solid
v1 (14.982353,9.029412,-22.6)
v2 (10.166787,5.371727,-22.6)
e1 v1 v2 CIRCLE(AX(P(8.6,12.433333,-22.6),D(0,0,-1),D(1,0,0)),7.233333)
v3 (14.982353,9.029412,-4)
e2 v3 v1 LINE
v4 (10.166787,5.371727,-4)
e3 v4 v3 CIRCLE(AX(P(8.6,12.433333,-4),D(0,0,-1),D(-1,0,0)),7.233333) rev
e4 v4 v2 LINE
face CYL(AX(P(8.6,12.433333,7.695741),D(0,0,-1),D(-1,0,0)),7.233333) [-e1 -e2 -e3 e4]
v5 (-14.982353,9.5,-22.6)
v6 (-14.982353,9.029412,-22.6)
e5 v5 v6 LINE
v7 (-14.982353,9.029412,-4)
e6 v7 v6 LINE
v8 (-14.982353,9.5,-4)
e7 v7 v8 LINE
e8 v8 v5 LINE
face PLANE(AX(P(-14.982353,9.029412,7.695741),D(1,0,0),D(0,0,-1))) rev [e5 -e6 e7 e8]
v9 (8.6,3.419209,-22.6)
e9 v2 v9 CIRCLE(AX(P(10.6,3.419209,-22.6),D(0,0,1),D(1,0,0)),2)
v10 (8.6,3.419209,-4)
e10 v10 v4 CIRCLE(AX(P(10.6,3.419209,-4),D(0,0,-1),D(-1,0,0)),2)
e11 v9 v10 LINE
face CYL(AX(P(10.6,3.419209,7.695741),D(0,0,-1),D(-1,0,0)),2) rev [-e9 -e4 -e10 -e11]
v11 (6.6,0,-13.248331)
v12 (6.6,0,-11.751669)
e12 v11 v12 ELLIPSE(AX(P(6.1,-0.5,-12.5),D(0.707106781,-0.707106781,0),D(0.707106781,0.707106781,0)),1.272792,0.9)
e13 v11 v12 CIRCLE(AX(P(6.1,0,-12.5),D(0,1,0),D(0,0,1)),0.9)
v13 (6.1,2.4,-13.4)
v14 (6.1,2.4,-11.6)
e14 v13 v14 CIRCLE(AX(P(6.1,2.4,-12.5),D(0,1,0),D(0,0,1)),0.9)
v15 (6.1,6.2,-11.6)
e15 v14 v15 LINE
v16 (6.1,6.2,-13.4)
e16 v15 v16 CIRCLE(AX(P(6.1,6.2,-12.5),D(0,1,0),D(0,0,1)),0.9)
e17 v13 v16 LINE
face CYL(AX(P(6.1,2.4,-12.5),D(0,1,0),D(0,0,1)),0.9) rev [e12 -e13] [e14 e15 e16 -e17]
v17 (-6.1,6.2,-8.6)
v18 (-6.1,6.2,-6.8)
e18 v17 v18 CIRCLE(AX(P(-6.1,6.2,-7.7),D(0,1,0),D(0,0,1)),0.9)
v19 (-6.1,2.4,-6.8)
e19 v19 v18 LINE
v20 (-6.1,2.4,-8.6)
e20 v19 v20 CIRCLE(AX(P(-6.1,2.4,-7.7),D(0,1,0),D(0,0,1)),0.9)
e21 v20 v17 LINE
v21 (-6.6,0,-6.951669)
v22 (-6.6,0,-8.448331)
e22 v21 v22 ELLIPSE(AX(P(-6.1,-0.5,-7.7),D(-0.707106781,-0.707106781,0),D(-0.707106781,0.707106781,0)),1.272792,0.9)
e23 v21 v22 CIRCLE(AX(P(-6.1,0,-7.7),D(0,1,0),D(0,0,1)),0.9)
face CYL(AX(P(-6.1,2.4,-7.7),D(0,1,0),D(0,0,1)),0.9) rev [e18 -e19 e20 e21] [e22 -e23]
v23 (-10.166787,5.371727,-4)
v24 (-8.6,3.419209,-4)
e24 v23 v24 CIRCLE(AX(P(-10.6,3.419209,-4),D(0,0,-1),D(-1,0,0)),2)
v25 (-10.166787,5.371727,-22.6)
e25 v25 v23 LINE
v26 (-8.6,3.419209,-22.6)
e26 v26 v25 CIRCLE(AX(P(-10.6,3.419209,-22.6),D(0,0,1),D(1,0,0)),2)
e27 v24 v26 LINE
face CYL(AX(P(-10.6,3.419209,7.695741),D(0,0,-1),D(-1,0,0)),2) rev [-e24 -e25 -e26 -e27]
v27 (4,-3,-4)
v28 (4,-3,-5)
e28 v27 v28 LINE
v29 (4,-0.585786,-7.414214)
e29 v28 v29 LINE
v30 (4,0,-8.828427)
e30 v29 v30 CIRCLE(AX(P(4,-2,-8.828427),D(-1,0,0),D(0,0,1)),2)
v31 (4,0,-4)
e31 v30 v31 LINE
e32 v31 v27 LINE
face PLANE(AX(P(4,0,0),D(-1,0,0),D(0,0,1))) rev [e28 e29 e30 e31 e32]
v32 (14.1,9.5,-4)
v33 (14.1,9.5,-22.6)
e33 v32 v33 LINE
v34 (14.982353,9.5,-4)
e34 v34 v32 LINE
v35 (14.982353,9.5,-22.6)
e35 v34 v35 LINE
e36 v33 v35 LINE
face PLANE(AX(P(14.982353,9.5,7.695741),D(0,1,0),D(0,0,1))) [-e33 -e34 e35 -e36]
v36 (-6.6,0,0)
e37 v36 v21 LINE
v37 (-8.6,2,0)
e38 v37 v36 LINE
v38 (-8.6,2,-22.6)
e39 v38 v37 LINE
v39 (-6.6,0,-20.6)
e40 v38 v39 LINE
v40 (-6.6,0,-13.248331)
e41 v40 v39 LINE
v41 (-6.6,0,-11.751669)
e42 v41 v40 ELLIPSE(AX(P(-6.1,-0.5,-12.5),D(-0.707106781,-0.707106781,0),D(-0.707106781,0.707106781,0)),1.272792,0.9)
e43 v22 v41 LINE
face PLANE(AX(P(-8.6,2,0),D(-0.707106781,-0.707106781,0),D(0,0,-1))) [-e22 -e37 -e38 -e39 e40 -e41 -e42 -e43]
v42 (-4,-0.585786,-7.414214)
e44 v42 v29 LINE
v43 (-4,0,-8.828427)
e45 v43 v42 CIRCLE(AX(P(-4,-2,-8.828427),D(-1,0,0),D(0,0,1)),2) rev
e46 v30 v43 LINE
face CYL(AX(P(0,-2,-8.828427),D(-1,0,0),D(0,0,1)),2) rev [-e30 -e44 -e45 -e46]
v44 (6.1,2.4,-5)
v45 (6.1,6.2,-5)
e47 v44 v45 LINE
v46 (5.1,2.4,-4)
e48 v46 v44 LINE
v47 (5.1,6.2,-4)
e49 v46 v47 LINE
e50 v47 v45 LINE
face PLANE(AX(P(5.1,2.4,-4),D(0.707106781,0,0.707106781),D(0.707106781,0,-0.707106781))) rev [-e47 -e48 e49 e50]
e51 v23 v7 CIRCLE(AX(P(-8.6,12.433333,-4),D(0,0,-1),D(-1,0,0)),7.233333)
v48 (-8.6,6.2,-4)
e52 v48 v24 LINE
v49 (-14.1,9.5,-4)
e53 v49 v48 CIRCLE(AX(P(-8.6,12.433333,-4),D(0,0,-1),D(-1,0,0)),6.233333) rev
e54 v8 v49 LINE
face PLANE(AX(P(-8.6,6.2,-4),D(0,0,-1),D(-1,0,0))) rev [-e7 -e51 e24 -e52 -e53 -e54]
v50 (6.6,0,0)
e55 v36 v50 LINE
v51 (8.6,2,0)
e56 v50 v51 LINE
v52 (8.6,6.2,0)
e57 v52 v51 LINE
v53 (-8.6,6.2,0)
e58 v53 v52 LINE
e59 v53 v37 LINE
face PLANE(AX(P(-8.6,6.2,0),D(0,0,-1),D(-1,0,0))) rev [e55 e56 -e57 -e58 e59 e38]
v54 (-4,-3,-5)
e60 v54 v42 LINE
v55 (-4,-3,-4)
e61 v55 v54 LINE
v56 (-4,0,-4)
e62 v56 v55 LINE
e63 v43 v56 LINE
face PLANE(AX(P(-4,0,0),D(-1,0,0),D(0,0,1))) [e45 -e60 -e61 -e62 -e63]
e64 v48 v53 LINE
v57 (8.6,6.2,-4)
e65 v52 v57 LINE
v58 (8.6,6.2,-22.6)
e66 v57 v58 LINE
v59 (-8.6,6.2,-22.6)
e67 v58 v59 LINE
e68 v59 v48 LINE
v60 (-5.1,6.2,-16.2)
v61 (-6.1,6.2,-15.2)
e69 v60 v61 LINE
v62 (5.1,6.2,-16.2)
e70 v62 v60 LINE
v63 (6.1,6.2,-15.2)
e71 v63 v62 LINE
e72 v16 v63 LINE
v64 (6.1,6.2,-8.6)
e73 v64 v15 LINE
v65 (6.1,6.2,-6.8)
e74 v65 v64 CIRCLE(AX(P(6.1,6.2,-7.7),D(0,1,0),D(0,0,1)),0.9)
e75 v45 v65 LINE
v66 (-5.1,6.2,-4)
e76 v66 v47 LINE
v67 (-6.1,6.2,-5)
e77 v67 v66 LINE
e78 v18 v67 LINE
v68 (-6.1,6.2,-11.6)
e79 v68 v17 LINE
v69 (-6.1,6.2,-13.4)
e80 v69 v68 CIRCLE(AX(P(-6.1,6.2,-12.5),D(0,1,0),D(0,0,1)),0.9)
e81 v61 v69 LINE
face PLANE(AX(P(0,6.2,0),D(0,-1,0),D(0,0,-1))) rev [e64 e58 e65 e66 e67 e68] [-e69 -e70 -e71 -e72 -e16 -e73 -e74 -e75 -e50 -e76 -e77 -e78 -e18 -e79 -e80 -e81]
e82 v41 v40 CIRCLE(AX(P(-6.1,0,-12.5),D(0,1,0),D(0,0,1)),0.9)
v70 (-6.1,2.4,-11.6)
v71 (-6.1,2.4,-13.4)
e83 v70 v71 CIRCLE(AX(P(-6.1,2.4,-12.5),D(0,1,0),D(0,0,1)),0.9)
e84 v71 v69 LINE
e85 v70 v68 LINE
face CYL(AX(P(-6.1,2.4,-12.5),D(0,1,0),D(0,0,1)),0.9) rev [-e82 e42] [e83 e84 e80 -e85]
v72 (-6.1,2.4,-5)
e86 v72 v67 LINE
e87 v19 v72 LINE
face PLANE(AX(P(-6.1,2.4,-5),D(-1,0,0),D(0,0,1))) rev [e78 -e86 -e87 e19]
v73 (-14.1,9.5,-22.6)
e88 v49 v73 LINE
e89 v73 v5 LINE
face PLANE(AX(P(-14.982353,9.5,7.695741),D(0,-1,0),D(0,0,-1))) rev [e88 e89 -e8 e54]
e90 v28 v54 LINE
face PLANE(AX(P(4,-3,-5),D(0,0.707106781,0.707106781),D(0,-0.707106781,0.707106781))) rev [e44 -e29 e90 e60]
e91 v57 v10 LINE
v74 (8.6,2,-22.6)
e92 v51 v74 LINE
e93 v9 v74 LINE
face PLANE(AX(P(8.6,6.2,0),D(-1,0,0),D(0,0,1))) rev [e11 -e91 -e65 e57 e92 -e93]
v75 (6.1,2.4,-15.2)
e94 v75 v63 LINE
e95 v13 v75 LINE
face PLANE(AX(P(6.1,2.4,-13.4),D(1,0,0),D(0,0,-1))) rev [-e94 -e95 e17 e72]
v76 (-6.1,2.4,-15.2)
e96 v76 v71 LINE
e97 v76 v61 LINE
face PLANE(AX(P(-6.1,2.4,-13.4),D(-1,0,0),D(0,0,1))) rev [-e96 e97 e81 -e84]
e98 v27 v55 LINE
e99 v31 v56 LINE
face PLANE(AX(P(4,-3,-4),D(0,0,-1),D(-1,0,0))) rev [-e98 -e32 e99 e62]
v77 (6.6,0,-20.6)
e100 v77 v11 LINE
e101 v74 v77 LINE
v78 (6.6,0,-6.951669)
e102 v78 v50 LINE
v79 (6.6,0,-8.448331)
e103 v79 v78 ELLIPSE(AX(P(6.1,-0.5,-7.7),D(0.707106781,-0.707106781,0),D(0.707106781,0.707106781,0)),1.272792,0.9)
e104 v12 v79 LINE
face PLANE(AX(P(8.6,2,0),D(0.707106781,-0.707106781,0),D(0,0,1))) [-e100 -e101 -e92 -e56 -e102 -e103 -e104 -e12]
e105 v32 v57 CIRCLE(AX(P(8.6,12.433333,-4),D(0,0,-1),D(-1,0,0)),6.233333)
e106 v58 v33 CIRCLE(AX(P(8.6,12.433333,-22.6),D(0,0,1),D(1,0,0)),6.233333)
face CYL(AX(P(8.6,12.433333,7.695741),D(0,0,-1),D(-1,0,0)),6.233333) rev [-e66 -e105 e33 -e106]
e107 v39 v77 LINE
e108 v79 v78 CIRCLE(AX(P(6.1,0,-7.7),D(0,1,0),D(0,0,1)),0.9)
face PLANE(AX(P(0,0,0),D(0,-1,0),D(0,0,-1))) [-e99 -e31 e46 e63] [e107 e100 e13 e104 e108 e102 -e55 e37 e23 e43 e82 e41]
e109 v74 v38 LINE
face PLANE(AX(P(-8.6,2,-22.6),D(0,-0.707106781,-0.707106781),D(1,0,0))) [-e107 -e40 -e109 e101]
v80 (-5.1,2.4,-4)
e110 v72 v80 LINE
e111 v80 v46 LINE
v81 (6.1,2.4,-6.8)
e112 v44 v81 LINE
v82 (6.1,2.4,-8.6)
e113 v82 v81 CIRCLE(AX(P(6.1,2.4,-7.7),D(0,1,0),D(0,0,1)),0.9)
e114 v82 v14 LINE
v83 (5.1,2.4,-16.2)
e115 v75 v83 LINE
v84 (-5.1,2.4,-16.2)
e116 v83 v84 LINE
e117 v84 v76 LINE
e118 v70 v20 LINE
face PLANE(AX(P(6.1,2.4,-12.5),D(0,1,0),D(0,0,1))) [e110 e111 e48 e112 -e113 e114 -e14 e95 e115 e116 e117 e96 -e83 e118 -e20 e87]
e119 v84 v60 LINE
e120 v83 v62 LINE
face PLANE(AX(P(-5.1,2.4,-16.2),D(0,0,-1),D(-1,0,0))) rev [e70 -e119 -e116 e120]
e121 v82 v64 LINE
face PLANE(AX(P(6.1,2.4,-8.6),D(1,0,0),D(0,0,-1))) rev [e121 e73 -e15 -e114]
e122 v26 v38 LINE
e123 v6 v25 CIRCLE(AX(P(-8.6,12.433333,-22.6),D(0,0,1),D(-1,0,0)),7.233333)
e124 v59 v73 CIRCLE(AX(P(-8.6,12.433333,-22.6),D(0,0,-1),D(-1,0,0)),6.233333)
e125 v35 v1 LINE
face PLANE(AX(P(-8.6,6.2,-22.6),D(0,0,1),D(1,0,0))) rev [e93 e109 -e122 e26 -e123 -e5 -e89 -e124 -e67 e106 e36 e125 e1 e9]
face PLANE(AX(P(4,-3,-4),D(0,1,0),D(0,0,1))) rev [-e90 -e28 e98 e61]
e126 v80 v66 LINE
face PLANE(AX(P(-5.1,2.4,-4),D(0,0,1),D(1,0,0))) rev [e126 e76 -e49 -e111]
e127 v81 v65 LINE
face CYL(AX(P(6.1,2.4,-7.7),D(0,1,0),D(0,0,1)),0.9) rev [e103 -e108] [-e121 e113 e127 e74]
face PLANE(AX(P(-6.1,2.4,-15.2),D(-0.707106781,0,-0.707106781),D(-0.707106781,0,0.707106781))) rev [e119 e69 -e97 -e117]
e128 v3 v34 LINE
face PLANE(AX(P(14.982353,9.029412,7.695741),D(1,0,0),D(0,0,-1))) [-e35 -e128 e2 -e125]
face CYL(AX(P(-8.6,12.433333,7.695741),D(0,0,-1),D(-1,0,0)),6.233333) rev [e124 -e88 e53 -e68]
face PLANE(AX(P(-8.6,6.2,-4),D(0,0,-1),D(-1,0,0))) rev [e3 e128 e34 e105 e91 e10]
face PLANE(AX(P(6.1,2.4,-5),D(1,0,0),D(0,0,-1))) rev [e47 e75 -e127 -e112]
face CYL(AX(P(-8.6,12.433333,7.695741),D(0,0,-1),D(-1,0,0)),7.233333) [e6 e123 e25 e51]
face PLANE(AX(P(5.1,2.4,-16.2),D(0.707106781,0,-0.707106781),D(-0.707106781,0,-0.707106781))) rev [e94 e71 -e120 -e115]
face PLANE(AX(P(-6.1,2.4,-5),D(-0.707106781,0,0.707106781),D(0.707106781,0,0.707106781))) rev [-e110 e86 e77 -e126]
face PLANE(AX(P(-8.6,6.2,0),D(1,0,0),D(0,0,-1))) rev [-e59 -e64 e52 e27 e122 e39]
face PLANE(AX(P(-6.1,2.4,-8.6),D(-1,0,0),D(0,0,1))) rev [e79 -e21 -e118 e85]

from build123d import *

# Parameters (mm, degrees)
ESQUISSE1_W             = 17.2
ESQUISSE1_H             = 22.6
BOSS_EXTRU_1_DEPTH      = 6.2
ENL_V_MAT_EXTRU_1_DEPTH = 3.8
ESQUISSE3_R             = 0.9
ENL_V_MAT_EXTRU_2_DEPTH = 25.477744994
CHANFREIN1_SIZE         = 2
BOSS_EXTRU_2_DEPTH      = 18.6
BOSS_EXTRU_3_DEPTH      = 4
CONG_1_R                = 2


with BuildPart() as part:
    # Esquisse1 → Boss.-Extru.1 (new body)
    with BuildSketch(Plane(origin=(0, 0, 0), x_dir=(1, 0, 0), z_dir=(0, 1, 0))):
        with Locations((0, 11.3)):
            Rectangle(ESQUISSE1_W, ESQUISSE1_H)
    extrude(amount=BOSS_EXTRU_1_DEPTH)

    # Esquisse2 → Enlèv. mat.-Extru.1 (cut)
    with BuildSketch(Plane(origin=(0, 6.2, 0), x_dir=(1, 0, 0), z_dir=(0, 1, 0))):
        with BuildLine():
            Line((-5.1, 4), (5.1, 4))
            Line((5.1, 4), (6.1, 5))
            Line((6.1, 5), (6.1, 6.8))
            ThreePointArc((6.1, 6.8), (7, 7.7), (6.1, 8.6))
            Line((6.1, 8.6), (6.1, 11.6))
            ThreePointArc((6.1, 11.6), (7, 12.5), (6.1, 13.4))
            Line((6.1, 13.4), (6.1, 15.2))
            Line((6.1, 15.2), (5.1, 16.2))
            Line((5.1, 16.2), (-5.1, 16.2))
            Line((-5.1, 16.2), (-6.1, 15.2))
            Line((-6.1, 15.2), (-6.1, 13.4))
            ThreePointArc((-6.1, 13.4), (-7, 12.5), (-6.1, 11.6))
            Line((-6.1, 11.6), (-6.1, 8.6))
            ThreePointArc((-6.1, 8.6), (-7, 7.7), (-6.1, 6.8))
            Line((-6.1, 6.8), (-6.1, 5))
            Line((-6.1, 5), (-5.1, 4))
        make_face()
    extrude(amount=-ENL_V_MAT_EXTRU_1_DEPTH, mode=Mode.SUBTRACT)

    # Esquisse3 → Enlèv. mat.-Extru.2 (cut, through all)
    with BuildSketch(Plane(origin=(0, 2.4, 0), x_dir=(1, 0, 0), z_dir=(0, 1, 0))):
        with Locations(Location((6.1, 12.5, 0), (0, 0, 270))):
            Circle(ESQUISSE3_R)
        with Locations(Location((-6.1, 12.5, 0), (0, 0, 270))):
            Circle(ESQUISSE3_R)
        with Locations(Location((-6.1, 7.7, 0), (0, 0, 270))):
            Circle(ESQUISSE3_R)
        with Locations(Location((6.1, 7.7, 0), (0, 0, 270))):
            Circle(ESQUISSE3_R)
    extrude(amount=-ENL_V_MAT_EXTRU_2_DEPTH, mode=Mode.SUBTRACT)

    # Chanfrein1
    # the kernel refuses this chamfer: 2 mm, written as the material it takes off along each edge
    with BuildSketch(Plane(origin=(13.743365976, 0, -22.6), x_dir=(0, -0.02749587661058639, 0.9996219169112968), z_dir=(-1, 0, 0))) as chanfrein1_piece_1:
        Polygon((CHANFREIN1_SIZE * 0.999621916911, CHANFREIN1_SIZE * 0.0274958766106), (-CHANFREIN1_SIZE * 0.0274958766106, CHANFREIN1_SIZE * 0.999621916911), (0, 0), align=None)
    extrude(amount=27.486731952, mode=Mode.SUBTRACT)
    with BuildSketch(Plane(origin=(8.6, 0, 5.143365976), x_dir=(0.027495876610586494, 0.9996219169112968, 0), z_dir=(0, 0, -1)), Plane(origin=(-8.6, 0, -27.743365976), x_dir=(-0.027495876610586494, 0.9996219169112968, 0), z_dir=(0, 0, 1))) as chanfrein1_piece_2:
        Polygon((CHANFREIN1_SIZE * 0.999621916911, -CHANFREIN1_SIZE * 0.0274958766106), (-CHANFREIN1_SIZE * 0.0274958766106, -CHANFREIN1_SIZE * 0.999621916911), (0, 0), align=None)
    extrude(amount=32.886731952, mode=Mode.SUBTRACT)

    # Esquisse4 → Boss.-Extru.2 (add)
    with BuildSketch(Plane(origin=(0, 0, -22.6), x_dir=(-1, 0, 0), z_dir=(0, 0, -1))):
        with BuildLine():
            Line((-8.6, 6.2), (-8.6, 5.2))
            ThreePointArc((-8.6, 5.2), (-12.321519298, 6.230801171), (-14.982352941, 9.029411765))
            Line((-14.982352941, 9.029411765), (-14.982352941, 9.5))
            Line((-14.982352941, 9.5), (-14.1, 9.5))
            ThreePointArc((-14.1, 9.5), (-11.807023542, 7.088294096), (-8.6, 6.2))
        make_face()
    boss_extru_2 = extrude(amount=-BOSS_EXTRU_2_DEPTH)

    # Symétrie1: Boss.-Extru.2 across plane
    add(boss_extru_2.mirror(Plane(origin=(0, 0, 0), x_dir=(0, 0, 1), z_dir=(1, 0, 0))))

    # Esquisse5 → Boss.-Extru.3 (add, symmetric)
    with BuildSketch(Plane(origin=(0, 0, 0), x_dir=(0, 0, -1), z_dir=(1, 0, 0))):
        Polygon((4, 0), (8, 0), (5, -3), (4, -3), align=None)
    extrude(amount=BOSS_EXTRU_3_DEPTH, both=True)

    # Congé1
    cong_1_edges = [part.edges().sort_by_distance(p)[0] for p in [
        (8.6, 5.2, -13.3),
        (-8.6, 5.2, -13.3),
        (0, 0, -8),
    ]]
    fillet(cong_1_edges, radius=CONG_1_R)


solid = part.part
